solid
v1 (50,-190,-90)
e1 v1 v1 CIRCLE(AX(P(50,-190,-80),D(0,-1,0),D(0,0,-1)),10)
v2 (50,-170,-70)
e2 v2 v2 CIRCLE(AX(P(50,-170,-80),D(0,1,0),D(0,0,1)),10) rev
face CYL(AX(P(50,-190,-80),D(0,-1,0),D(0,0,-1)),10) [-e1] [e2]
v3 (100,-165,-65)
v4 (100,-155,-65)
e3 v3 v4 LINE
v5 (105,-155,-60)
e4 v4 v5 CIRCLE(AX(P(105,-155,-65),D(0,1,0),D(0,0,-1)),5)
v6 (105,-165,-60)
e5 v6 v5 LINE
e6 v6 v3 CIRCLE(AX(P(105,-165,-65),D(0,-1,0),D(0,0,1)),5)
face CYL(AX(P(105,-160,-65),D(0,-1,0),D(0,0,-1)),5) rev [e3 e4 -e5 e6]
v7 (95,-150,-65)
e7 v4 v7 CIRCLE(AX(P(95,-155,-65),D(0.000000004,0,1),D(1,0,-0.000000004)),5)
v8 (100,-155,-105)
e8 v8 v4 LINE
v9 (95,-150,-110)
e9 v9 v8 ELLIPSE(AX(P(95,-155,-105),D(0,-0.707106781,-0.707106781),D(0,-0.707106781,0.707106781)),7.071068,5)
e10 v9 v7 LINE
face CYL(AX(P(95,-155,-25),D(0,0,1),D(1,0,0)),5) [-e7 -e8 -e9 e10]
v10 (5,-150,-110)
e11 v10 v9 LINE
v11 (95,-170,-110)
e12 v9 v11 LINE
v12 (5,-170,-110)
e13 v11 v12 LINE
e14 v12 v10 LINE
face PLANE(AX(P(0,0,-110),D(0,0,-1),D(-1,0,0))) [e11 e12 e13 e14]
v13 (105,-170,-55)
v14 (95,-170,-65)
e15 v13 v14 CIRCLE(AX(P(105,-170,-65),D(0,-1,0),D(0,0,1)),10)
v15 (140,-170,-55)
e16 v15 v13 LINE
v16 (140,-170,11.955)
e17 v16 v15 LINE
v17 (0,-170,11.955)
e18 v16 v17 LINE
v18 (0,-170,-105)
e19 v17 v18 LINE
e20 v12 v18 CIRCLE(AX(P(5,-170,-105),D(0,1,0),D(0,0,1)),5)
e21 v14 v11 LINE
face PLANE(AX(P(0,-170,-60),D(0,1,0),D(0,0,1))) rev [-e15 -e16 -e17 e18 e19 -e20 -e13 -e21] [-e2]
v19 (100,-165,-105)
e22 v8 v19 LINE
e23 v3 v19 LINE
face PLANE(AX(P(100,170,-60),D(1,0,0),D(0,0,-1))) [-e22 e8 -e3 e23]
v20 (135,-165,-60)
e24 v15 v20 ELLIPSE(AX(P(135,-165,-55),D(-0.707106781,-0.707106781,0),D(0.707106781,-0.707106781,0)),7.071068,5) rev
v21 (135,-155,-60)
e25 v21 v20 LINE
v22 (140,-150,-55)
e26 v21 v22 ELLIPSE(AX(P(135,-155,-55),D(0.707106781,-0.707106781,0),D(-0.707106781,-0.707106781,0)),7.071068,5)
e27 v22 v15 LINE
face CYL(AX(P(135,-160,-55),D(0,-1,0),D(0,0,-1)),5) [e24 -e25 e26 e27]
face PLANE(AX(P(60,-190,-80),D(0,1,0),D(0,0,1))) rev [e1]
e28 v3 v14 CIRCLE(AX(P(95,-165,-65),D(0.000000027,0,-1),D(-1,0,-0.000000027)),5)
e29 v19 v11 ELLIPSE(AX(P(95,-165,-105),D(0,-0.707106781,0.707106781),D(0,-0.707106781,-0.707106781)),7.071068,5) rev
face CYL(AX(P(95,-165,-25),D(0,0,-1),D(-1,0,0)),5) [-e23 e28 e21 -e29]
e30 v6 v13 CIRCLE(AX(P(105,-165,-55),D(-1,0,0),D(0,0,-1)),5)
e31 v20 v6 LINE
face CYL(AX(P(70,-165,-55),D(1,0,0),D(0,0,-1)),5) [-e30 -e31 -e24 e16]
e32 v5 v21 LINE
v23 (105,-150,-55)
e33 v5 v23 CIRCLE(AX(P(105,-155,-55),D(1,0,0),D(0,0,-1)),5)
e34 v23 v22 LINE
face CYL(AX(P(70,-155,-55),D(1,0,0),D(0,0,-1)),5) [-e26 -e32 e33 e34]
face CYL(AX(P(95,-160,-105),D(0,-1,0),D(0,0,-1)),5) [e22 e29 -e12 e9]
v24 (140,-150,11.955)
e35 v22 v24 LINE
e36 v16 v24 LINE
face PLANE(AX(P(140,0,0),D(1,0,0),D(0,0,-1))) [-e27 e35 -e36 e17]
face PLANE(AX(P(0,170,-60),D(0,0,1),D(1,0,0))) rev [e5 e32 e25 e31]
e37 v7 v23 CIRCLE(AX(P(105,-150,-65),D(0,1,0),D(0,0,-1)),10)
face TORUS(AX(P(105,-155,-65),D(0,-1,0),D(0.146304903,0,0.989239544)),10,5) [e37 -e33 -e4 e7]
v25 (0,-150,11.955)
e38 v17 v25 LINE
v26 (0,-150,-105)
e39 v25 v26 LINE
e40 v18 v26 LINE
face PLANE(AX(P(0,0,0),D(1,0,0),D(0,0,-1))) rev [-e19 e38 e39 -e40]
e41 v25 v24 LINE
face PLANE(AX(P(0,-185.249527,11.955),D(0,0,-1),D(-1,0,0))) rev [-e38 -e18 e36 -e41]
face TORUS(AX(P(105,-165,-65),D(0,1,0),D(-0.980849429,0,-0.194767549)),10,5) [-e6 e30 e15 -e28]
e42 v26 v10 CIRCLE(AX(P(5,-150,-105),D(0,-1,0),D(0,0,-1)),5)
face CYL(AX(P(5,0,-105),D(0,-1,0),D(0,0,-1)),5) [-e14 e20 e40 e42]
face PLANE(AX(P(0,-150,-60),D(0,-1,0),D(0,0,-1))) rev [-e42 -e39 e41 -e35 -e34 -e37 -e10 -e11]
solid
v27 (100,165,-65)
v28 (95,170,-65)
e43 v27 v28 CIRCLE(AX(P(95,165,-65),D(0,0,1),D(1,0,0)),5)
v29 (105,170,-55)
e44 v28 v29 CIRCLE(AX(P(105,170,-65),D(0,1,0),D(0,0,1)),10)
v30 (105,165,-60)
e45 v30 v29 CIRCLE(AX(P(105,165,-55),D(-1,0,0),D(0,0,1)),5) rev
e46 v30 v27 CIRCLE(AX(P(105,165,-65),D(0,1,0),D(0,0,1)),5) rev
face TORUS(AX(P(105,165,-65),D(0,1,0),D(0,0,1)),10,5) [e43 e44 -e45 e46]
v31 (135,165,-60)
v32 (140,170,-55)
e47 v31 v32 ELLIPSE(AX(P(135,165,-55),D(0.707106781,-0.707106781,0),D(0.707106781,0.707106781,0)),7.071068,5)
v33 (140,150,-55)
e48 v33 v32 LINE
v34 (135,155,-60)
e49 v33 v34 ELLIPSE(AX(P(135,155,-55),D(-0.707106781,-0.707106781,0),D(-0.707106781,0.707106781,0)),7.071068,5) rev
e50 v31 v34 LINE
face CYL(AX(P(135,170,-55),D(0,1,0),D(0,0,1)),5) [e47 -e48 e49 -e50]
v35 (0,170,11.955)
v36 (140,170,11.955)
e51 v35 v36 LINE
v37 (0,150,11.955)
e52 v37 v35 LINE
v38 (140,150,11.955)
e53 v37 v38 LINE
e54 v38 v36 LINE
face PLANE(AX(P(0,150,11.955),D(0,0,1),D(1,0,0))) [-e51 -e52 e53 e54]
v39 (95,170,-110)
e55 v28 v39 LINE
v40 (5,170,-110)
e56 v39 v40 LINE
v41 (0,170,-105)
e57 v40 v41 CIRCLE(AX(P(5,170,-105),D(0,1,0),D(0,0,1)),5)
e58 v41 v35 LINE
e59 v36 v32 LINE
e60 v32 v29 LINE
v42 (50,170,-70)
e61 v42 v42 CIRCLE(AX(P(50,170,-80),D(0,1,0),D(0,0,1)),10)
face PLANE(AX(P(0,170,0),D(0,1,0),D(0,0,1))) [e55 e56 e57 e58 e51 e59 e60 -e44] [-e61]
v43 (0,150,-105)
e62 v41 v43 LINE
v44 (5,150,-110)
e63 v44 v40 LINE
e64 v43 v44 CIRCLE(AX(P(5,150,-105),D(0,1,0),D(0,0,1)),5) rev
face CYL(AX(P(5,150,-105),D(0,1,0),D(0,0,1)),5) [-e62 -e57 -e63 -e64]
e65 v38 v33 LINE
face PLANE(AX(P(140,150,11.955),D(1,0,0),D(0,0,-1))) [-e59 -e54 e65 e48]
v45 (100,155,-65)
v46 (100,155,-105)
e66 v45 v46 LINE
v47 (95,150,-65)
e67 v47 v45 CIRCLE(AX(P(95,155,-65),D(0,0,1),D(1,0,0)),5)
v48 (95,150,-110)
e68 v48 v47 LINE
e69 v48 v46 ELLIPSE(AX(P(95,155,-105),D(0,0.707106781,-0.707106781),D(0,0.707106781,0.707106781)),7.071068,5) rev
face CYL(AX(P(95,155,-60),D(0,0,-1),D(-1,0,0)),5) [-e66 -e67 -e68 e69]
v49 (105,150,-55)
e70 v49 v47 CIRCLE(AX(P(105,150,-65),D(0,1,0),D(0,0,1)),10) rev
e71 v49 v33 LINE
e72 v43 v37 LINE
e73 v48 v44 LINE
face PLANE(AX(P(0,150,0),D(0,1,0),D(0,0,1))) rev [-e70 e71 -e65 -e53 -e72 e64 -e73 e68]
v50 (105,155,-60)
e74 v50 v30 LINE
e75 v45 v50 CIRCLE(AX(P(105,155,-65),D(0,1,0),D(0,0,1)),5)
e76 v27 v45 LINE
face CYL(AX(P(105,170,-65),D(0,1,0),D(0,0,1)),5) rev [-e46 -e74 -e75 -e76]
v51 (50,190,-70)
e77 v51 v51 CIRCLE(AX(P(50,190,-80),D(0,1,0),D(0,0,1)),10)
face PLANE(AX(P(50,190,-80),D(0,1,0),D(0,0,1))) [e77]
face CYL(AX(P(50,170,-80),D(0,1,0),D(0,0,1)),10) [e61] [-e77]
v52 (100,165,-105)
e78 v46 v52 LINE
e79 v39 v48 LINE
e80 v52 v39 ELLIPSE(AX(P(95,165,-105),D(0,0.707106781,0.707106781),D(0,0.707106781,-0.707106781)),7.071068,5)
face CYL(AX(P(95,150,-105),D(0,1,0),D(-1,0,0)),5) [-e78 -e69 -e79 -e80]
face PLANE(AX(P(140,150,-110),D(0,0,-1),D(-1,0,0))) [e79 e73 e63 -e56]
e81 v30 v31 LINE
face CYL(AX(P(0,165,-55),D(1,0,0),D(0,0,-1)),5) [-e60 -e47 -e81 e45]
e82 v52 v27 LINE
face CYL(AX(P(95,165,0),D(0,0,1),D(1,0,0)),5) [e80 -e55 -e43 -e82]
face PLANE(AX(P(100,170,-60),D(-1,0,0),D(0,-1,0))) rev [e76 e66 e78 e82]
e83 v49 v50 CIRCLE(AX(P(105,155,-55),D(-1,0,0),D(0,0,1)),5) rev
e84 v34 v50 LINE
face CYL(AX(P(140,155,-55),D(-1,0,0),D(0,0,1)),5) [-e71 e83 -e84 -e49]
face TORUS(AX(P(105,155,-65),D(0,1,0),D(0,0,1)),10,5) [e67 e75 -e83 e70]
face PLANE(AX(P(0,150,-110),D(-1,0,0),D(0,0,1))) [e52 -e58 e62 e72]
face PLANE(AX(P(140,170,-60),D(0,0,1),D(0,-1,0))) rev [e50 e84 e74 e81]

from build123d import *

# Parameters (mm, degrees)
SKETCH1_W            = 140
SKETCH1_H            = 121.955
BOSS_EXTRUDE1_DEPTH  = 20
SKETCH2_W            = 40
SKETCH2_H            = 50
CUT_EXTRUDE1_DEPTH   = 180.164728672
SKETCH3_W            = 10
SKETCH3_H            = 20
FILLET1_R            = 5
REVOLVE2_START       = -170
REVOLVE2_DEPTH       = 20
REVOLVE2_START_2     = -190
REVOLVE2_2_OUTLINE_R = 10
REVOLVE2_2_DEPTH     = 20
REVOLVE2_START_3     = 104.9999999
REVOLVE2_4_DEPTH     = 36.0000001
REVOLVE2_START_4     = -111
REVOLVE2_5_DEPTH     = 46


with BuildPart() as part:
    # Sketch1 → Boss-Extrude1 (new body)
    with BuildSketch(Plane(origin=(0, 170, 0), x_dir=(1, 0, 0), z_dir=(0, 1, 0))):
        with Locations((70, 49.0225)):
            Rectangle(SKETCH1_W, SKETCH1_H)
    extrude(amount=-BOSS_EXTRUDE1_DEPTH)

    # Sketch2 → Cut-Extrude1 (cut, through all)
    with BuildSketch(Plane.XZ.offset(-150)):
        with Locations((120, -85)):
            Rectangle(SKETCH2_W, SKETCH2_H)
    extrude(amount=-CUT_EXTRUDE1_DEPTH, mode=Mode.SUBTRACT)

    # Sketch3 → Revolve1 (revolve)
    with BuildSketch(Plane(origin=(0, 0, -80), x_dir=(-1, 0, 0), z_dir=(0, 0, -1)), mode=Mode.PRIVATE) as revolve1_sk:
        with Locations((-55, 180)):
            Rectangle(SKETCH3_W, SKETCH3_H)
    revolve(revolve1_sk.sketch.rotate(Axis((50, 170, -80), (0, 1, 0)), 270), axis=Axis((50, 170, -80), (0, 1, 0)))

    # Fillet1
    fillet1_edges = [part.edges().sort_by_distance(p)[0] for p in [
        (140, 160, -60),
        (100, 170, -85),
        (100, 160, -110),
        (120, 170, -60),
        (100, 160, -60),
        (120, 150, -60),
        (100, 150, -85),
        (0, 160, -110),
    ]]
    fillet(fillet1_edges, radius=FILLET1_R)


with BuildPart() as body_2:
    # Revolve2: read off the stored shape, not the designer's step
    # Revolve2 outline → Revolve2 (new body)
    with BuildSketch(Plane(origin=(0, 0, 0), x_dir=(1, 0, 0), z_dir=(0, 1, 0)).offset(REVOLVE2_START)):
        with BuildLine():
            Line((135, 60), (105, 60))
            ThreePointArc((105, 60), (101.464466094, 61.464466094), (100, 65))
            Line((100, 65), (100, 105))
            ThreePointArc((100, 105), (98.535533906, 108.535533906), (95, 110))
            Line((95, 110), (5, 110))
            ThreePointArc((5, 110), (1.464466094, 108.535533906), (0, 105))
            Line((0, 105), (0, -11.955))
            Line((0, -11.955), (140, -11.955))
            Line((140, -11.955), (140, 55))
            ThreePointArc((140, 55), (138.535533906, 58.535533906), (135, 60))
        make_face()
    extrude(amount=REVOLVE2_DEPTH)

    # Revolve2 2 outline → Revolve2 2 (add)
    with BuildSketch(Plane(origin=(0, 0, 0), x_dir=(1, 0, 0), z_dir=(0, 1, 0)).offset(REVOLVE2_START_2)):
        with Locations((50, 80)):
            Circle(REVOLVE2_2_OUTLINE_R)
    extrude(amount=REVOLVE2_2_DEPTH)

    # Revolve2 3 outline → Revolve2 3 (revolve, cut)
    with BuildSketch(Plane(origin=(105, 0, -65), x_dir=(1, 0, 0), z_dir=(0, 0, 1))):
        with BuildLine():
            ThreePointArc((10, -170), (6.464466094, -168.535533906), (5, -165))
            Line((5, -165), (5, -170))
            Line((5, -170), (10, -170))
        make_face()
        with BuildLine():
            Line((5, -150), (5, -155))
            ThreePointArc((5, -155), (6.464466094, -151.464466094), (10, -150))
            Line((10, -150), (5, -150))
        make_face()
    revolve(axis=Axis((105, 0, -65), (0, 1, 0)), mode=Mode.SUBTRACT)

    # Revolve2 4 outline → Revolve2 4 (cut)
    with BuildSketch(Plane.YZ.offset(REVOLVE2_START_3)):
        with BuildLine():
            ThreePointArc((-150, -55), (-151.464466094, -58.535533906), (-155, -60))
            Line((-155, -60), (-150, -60))
            Line((-150, -60), (-150, -55))
        make_face()
        with BuildLine():
            ThreePointArc((-165, -60), (-168.535533906, -58.535533906), (-170, -55))
            Line((-170, -55), (-170, -60))
            Line((-170, -60), (-165, -60))
        make_face()
    extrude(amount=REVOLVE2_4_DEPTH, mode=Mode.SUBTRACT)

    # Revolve2 5 outline → Revolve2 5 (cut)
    with BuildSketch(Plane.XY.offset(REVOLVE2_START_4)):
        with BuildLine():
            Line((100, -170), (100, -165))
            ThreePointArc((100, -165), (98.535533906, -168.535533906), (95, -170))
            Line((95, -170), (100, -170))
        make_face()
        with BuildLine():
            ThreePointArc((95, -150), (98.535533906, -151.464466094), (100, -155))
            Line((100, -155), (100, -150))
            Line((100, -150), (95, -150))
        make_face()
    extrude(amount=REVOLVE2_5_DEPTH, mode=Mode.SUBTRACT)


solid = Compound([part.part, body_2.part])
